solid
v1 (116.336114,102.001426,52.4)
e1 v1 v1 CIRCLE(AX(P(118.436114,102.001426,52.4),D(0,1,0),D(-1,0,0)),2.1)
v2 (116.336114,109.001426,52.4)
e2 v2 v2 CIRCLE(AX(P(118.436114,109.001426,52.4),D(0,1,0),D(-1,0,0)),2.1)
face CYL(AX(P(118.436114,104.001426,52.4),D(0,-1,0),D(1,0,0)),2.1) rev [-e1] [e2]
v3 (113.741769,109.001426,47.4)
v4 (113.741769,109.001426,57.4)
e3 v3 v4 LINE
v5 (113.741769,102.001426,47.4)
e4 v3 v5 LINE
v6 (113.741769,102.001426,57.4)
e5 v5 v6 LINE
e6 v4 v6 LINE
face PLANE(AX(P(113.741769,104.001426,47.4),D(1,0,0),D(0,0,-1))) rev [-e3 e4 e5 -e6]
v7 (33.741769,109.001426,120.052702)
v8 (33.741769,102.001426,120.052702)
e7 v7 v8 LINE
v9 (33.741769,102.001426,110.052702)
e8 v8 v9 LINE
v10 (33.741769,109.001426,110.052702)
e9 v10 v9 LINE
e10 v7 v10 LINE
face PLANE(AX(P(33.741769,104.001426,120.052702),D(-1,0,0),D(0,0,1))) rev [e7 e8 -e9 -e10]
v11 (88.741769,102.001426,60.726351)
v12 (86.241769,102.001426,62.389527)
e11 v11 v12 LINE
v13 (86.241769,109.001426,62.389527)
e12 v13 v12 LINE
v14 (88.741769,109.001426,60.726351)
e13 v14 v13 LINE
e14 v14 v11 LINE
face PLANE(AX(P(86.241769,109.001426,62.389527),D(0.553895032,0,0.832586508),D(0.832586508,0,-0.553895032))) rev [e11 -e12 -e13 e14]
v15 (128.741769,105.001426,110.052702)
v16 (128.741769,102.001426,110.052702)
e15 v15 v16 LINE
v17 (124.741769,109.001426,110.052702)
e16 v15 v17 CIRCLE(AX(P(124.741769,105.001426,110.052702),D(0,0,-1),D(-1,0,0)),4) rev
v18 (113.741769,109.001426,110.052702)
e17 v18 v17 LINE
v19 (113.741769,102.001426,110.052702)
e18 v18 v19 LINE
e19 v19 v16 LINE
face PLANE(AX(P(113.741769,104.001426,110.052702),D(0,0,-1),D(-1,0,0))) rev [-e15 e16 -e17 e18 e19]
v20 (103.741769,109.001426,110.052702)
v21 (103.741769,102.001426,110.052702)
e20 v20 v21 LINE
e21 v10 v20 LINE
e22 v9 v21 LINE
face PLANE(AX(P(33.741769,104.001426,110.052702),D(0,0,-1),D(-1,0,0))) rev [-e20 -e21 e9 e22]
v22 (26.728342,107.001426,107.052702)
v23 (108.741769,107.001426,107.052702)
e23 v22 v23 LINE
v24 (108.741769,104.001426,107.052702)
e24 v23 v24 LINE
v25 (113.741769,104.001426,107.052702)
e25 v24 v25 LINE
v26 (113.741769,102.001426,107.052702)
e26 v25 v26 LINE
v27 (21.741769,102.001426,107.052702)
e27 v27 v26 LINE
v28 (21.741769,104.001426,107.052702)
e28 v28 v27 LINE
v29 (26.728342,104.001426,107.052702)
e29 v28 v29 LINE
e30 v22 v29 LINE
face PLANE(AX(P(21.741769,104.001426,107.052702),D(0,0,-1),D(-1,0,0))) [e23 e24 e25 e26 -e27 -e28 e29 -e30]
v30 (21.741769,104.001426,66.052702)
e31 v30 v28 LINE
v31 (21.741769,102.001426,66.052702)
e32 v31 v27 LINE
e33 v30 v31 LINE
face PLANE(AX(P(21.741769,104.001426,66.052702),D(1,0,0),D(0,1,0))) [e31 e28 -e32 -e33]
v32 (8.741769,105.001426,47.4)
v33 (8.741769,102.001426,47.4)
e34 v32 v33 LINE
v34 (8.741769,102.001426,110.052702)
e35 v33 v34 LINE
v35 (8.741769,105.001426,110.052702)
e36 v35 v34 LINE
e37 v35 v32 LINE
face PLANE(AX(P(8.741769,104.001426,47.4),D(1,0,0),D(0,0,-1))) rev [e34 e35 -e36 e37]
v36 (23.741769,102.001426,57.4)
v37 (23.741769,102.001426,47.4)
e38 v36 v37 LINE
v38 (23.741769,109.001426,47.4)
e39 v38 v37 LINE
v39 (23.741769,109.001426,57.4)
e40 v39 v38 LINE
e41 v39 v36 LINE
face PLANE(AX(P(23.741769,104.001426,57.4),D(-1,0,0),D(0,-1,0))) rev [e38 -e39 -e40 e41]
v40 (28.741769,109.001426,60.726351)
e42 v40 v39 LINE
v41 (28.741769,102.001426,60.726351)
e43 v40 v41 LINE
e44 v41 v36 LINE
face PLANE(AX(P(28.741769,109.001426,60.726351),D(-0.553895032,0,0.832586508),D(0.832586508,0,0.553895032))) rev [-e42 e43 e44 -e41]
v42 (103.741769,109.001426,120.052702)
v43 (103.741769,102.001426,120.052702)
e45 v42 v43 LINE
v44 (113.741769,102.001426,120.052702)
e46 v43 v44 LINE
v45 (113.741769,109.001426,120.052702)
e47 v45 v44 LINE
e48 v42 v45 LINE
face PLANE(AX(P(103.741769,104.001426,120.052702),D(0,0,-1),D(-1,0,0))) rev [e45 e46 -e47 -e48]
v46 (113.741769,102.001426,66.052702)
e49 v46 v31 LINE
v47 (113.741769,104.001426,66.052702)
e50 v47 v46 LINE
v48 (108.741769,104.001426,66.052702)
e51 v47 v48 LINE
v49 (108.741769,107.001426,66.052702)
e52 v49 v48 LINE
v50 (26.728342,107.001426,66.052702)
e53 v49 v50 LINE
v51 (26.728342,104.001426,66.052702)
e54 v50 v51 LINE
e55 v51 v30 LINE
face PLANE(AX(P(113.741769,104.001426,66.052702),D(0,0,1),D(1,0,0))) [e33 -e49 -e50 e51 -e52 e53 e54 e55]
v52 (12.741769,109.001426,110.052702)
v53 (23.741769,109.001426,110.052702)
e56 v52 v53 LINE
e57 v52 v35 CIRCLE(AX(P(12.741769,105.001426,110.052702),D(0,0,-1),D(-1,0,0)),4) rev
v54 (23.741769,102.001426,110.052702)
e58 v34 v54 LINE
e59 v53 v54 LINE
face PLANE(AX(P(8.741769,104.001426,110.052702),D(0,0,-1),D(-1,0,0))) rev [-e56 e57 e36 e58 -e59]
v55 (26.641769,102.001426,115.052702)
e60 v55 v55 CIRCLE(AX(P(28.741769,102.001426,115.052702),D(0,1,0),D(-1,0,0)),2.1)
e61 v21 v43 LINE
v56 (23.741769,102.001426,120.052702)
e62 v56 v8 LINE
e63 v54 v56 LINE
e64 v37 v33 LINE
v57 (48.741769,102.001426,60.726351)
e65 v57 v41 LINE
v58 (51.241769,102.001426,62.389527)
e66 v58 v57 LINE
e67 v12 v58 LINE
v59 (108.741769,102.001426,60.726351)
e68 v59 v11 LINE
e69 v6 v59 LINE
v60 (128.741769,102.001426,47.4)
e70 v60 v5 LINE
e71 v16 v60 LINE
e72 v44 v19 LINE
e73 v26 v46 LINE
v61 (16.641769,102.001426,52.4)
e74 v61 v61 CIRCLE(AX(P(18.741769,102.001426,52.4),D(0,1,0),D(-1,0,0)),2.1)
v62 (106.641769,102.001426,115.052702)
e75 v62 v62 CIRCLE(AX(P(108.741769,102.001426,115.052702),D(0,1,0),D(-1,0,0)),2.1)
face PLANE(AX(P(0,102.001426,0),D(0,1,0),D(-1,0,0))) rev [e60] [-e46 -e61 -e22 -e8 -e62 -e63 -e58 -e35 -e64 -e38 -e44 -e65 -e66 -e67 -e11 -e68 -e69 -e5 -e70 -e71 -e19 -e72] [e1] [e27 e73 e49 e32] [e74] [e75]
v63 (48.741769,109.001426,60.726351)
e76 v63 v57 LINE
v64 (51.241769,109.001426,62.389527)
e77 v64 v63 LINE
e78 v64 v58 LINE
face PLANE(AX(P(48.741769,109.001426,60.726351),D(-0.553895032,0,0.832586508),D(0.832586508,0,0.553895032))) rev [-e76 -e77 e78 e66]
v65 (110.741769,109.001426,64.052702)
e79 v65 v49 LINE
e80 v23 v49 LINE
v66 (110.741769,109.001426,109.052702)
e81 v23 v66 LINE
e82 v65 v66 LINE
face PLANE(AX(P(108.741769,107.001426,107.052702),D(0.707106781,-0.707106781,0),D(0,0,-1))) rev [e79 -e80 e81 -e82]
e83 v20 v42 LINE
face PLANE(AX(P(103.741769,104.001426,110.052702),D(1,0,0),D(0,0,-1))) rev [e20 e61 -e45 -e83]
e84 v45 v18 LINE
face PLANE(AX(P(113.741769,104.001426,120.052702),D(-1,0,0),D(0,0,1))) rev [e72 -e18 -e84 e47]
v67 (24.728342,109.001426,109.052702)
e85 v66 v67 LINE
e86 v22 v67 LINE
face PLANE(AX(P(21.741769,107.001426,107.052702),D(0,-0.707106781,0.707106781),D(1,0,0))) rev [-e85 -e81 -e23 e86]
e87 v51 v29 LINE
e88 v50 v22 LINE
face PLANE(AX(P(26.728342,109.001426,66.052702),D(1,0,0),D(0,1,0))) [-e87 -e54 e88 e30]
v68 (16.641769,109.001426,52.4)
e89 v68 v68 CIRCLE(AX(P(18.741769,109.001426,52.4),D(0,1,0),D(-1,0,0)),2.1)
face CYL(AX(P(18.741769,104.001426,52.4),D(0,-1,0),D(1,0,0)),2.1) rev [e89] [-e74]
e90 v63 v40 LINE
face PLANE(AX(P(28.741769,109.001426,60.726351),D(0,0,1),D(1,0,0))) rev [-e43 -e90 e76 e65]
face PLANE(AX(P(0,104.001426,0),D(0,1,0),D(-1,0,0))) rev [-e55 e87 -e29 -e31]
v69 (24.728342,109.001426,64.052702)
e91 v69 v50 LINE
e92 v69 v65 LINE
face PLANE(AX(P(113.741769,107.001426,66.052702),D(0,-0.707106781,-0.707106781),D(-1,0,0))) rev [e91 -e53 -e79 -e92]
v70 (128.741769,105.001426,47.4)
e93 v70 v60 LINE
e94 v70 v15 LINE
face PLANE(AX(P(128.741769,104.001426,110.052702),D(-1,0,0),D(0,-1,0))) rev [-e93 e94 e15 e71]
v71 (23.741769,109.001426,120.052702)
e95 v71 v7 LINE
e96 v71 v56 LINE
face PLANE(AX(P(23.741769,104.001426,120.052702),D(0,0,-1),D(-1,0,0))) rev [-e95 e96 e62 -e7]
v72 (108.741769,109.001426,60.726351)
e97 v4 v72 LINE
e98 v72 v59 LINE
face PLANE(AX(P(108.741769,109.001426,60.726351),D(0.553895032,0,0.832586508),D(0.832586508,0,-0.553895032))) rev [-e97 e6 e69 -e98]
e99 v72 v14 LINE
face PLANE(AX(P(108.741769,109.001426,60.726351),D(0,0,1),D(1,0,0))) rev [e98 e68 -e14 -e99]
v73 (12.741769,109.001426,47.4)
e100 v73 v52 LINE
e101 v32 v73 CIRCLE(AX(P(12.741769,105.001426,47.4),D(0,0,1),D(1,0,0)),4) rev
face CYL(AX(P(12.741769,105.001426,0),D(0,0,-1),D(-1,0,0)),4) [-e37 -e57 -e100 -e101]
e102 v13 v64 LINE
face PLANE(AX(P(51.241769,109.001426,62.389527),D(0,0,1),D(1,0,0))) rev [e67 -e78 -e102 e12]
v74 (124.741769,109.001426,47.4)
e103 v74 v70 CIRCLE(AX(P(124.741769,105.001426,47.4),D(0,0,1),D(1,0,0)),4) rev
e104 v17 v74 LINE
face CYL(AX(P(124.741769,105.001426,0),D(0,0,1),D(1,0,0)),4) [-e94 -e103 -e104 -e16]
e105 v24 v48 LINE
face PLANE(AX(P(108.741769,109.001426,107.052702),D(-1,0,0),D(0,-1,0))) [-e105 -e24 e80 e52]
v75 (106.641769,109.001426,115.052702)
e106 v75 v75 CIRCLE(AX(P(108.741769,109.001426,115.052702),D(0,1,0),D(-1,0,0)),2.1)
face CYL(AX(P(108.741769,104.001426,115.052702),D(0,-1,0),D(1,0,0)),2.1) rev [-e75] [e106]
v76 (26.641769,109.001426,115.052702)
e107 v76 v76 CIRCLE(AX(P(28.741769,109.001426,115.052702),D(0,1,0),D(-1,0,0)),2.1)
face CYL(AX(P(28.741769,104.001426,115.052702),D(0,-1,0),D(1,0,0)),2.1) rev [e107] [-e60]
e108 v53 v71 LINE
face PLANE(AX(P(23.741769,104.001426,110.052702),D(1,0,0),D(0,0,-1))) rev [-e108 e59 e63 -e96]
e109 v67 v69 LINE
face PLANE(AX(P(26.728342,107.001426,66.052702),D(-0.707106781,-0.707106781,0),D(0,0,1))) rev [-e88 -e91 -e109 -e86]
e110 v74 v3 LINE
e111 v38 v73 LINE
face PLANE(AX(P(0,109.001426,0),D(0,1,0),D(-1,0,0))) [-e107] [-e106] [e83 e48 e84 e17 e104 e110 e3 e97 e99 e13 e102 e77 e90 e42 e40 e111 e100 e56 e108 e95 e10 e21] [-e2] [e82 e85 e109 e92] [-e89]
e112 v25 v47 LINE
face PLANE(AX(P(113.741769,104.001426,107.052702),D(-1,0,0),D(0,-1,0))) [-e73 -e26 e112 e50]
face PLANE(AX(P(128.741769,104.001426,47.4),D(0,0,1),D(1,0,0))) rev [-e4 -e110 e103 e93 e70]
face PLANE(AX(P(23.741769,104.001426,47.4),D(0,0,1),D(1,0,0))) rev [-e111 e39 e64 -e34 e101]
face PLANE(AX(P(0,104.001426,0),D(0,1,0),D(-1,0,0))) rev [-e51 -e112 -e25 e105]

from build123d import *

# Parameters (mm, degrees)
SKETCH_1_R      = 2.1
SKETCH_1_W      = 92
SKETCH_1_H      = 41
EXTRUDE_2_DEPTH = 2
SKETCH_2_R      = 2.1
SKETCH_2_W      = 82.013427323
SKETCH_2_H      = 41
EXTRUDE_5_DEPTH = 5
CHAMFER_START   = 102.001425994
CHAMFER_1_DEPTH = 7
FILLET_1_R      = 4


with BuildPart() as part:
    # Эскиз1 → Бобышка-Вытянуть2 (new body)
    with BuildSketch(Plane(origin=(68.741769048, 102.001425994, 80.052702475), x_dir=(1, 0, 0), z_dir=(0, 1, 0))):
        Polygon((-60, -30), (-45, -30), (-45, -40), (-35, -40), (-35, -30), (35, -30), (35, -40), (45, -40), (45, -30), (60, -30), (60, 32.652702475), (45, 32.652702475), (45, 22.652702475), (55, 22.652702475), (55, 16), (-55, 16), (-55, 22.652702475), (-45, 22.652702475), (-45, 32.652702475), (-60, 32.652702475), align=None)
        with Locations(Location((-50, 27.652702475, 0), (0, 0, 180))):
            Circle(SKETCH_1_R, mode=Mode.SUBTRACT)
        with Locations(Location((49.694344906, 27.652702475, 0), (0, 0, 180))):
            Circle(SKETCH_1_R, mode=Mode.SUBTRACT)
        with Locations(Location((40, -35, 0), (0, 0, 180))):
            Circle(SKETCH_1_R, mode=Mode.SUBTRACT)
        with Locations(Location((-40, -35, 0), (0, 0, 180))):
            Circle(SKETCH_1_R, mode=Mode.SUBTRACT)
        with Locations((-1, -6.5)):
            Rectangle(SKETCH_1_W, SKETCH_1_H, mode=Mode.SUBTRACT)
    extrude(amount=EXTRUDE_2_DEPTH)

    # Эскиз2 → Бобышка-Вытянуть5 (add)
    with BuildSketch(Plane(origin=(0, 104.001425994, 0), x_dir=(1, 0, 0), z_dir=(0, 1, 0))):
        Polygon((23.741769048, -57.4), (23.741769048, -47.4), (8.741769048, -47.4), (8.741769048, -110.052702475), (23.741769048, -110.052702475), (23.741769048, -120.052702475), (33.741769048, -120.052702475), (33.741769048, -110.052702475), (103.741769048, -110.052702475), (103.741769048, -120.052702475), (113.741769048, -120.052702475), (113.741769048, -110.052702475), (128.741769048, -110.052702475), (128.741769048, -47.4), (113.741769048, -47.4), (113.741769048, -57.4), (123.741769048, -57.4), (123.741769048, -64.052702475), (13.741769048, -64.052702475), (13.741769048, -57.4), align=None)
        with Locations(Location((18.741769048, -52.4, 0), (0, 0, 180))):
            Circle(SKETCH_2_R, mode=Mode.SUBTRACT)
        with Locations(Location((118.436113954, -52.4, 0), (0, 0, 180))):
            Circle(SKETCH_2_R, mode=Mode.SUBTRACT)
        with Locations(Location((108.741769048, -115.052702475, 0), (0, 0, 180))):
            Circle(SKETCH_2_R, mode=Mode.SUBTRACT)
        with Locations(Location((28.741769048, -115.052702475, 0), (0, 0, 180))):
            Circle(SKETCH_2_R, mode=Mode.SUBTRACT)
        with Locations((67.735055387, -86.552702475)):
            Rectangle(SKETCH_2_W, SKETCH_2_H, mode=Mode.SUBTRACT)
    extrude(amount=EXTRUDE_5_DEPTH)

    # Фаска1: read off the stored shape, not the designer's step
    # Фаска1 outline → Фаска1 (add)
    with BuildSketch(Plane(origin=(0, 0, 0), x_dir=(1, 0, 0), z_dir=(0, 1, 0)).offset(CHAMFER_START)):
        Polygon((28.741769048, -60.726351237), (23.741769048, -57.4), (13.741769048, -57.4), (13.741769048, -64.052702475), (123.741769048, -64.052702475), (123.741769048, -57.4), (113.741769048, -57.4), (108.741769048, -60.726351237), (88.741769048, -60.726351237), (86.241769048, -62.389526856), (51.241769048, -62.389526856), (48.741769048, -60.726351237), align=None)
    extrude(amount=CHAMFER_1_DEPTH)

    # Chamfer 1 2: loft between two sections, ruled curve by curve
    chamfer_1_2_from = [
        Edge.make_line((26.728341725, 107.001425994, 66.052702475), (26.728341725, 107.001425994, 107.052702475)),
        Edge.make_line((26.728341725, 107.001425994, 107.052702475), (108.741769048, 107.001425994, 107.052702475)),
        Edge.make_line((26.728341725, 107.001425994, 66.052702475), (108.741769048, 107.001425994, 66.052702475)),
        Edge.make_line((108.741769048, 107.001425994, 107.052702475), (108.741769048, 107.001425994, 66.052702475)),
    ]
    chamfer_1_2_to = [
        Edge.make_line((24.728341725, 109.001425994, 64.052702475), (24.728341725, 109.001425994, 109.052702475)),
        Edge.make_line((24.728341725, 109.001425994, 109.052702475), (110.741769048, 109.001425994, 109.052702475)),
        Edge.make_line((24.728341725, 109.001425994, 64.052702475), (110.741769048, 109.001425994, 64.052702475)),
        Edge.make_line((110.741769048, 109.001425994, 109.052702475), (110.741769048, 109.001425994, 64.052702475)),
    ]
    chamfer_1_2 = Solid(Shell([*[Face.make_surface_from_curves(chamfer_1_2_from[k], chamfer_1_2_to[k]) for k in range(4)], Face(Wire(chamfer_1_2_from)), Face(Wire(chamfer_1_2_to))]))
    add(chamfer_1_2, mode=Mode.SUBTRACT)

    # Скругление1
    fillet_1_edges = [part.edges().sort_by_distance(p)[0] for p in [
        (8.741769048, 109.001425994, 78.726351237),
        (128.741769048, 109.001425994, 78.726351237),
    ]]
    fillet(fillet_1_edges, radius=FILLET_1_R)


solid = part.part
